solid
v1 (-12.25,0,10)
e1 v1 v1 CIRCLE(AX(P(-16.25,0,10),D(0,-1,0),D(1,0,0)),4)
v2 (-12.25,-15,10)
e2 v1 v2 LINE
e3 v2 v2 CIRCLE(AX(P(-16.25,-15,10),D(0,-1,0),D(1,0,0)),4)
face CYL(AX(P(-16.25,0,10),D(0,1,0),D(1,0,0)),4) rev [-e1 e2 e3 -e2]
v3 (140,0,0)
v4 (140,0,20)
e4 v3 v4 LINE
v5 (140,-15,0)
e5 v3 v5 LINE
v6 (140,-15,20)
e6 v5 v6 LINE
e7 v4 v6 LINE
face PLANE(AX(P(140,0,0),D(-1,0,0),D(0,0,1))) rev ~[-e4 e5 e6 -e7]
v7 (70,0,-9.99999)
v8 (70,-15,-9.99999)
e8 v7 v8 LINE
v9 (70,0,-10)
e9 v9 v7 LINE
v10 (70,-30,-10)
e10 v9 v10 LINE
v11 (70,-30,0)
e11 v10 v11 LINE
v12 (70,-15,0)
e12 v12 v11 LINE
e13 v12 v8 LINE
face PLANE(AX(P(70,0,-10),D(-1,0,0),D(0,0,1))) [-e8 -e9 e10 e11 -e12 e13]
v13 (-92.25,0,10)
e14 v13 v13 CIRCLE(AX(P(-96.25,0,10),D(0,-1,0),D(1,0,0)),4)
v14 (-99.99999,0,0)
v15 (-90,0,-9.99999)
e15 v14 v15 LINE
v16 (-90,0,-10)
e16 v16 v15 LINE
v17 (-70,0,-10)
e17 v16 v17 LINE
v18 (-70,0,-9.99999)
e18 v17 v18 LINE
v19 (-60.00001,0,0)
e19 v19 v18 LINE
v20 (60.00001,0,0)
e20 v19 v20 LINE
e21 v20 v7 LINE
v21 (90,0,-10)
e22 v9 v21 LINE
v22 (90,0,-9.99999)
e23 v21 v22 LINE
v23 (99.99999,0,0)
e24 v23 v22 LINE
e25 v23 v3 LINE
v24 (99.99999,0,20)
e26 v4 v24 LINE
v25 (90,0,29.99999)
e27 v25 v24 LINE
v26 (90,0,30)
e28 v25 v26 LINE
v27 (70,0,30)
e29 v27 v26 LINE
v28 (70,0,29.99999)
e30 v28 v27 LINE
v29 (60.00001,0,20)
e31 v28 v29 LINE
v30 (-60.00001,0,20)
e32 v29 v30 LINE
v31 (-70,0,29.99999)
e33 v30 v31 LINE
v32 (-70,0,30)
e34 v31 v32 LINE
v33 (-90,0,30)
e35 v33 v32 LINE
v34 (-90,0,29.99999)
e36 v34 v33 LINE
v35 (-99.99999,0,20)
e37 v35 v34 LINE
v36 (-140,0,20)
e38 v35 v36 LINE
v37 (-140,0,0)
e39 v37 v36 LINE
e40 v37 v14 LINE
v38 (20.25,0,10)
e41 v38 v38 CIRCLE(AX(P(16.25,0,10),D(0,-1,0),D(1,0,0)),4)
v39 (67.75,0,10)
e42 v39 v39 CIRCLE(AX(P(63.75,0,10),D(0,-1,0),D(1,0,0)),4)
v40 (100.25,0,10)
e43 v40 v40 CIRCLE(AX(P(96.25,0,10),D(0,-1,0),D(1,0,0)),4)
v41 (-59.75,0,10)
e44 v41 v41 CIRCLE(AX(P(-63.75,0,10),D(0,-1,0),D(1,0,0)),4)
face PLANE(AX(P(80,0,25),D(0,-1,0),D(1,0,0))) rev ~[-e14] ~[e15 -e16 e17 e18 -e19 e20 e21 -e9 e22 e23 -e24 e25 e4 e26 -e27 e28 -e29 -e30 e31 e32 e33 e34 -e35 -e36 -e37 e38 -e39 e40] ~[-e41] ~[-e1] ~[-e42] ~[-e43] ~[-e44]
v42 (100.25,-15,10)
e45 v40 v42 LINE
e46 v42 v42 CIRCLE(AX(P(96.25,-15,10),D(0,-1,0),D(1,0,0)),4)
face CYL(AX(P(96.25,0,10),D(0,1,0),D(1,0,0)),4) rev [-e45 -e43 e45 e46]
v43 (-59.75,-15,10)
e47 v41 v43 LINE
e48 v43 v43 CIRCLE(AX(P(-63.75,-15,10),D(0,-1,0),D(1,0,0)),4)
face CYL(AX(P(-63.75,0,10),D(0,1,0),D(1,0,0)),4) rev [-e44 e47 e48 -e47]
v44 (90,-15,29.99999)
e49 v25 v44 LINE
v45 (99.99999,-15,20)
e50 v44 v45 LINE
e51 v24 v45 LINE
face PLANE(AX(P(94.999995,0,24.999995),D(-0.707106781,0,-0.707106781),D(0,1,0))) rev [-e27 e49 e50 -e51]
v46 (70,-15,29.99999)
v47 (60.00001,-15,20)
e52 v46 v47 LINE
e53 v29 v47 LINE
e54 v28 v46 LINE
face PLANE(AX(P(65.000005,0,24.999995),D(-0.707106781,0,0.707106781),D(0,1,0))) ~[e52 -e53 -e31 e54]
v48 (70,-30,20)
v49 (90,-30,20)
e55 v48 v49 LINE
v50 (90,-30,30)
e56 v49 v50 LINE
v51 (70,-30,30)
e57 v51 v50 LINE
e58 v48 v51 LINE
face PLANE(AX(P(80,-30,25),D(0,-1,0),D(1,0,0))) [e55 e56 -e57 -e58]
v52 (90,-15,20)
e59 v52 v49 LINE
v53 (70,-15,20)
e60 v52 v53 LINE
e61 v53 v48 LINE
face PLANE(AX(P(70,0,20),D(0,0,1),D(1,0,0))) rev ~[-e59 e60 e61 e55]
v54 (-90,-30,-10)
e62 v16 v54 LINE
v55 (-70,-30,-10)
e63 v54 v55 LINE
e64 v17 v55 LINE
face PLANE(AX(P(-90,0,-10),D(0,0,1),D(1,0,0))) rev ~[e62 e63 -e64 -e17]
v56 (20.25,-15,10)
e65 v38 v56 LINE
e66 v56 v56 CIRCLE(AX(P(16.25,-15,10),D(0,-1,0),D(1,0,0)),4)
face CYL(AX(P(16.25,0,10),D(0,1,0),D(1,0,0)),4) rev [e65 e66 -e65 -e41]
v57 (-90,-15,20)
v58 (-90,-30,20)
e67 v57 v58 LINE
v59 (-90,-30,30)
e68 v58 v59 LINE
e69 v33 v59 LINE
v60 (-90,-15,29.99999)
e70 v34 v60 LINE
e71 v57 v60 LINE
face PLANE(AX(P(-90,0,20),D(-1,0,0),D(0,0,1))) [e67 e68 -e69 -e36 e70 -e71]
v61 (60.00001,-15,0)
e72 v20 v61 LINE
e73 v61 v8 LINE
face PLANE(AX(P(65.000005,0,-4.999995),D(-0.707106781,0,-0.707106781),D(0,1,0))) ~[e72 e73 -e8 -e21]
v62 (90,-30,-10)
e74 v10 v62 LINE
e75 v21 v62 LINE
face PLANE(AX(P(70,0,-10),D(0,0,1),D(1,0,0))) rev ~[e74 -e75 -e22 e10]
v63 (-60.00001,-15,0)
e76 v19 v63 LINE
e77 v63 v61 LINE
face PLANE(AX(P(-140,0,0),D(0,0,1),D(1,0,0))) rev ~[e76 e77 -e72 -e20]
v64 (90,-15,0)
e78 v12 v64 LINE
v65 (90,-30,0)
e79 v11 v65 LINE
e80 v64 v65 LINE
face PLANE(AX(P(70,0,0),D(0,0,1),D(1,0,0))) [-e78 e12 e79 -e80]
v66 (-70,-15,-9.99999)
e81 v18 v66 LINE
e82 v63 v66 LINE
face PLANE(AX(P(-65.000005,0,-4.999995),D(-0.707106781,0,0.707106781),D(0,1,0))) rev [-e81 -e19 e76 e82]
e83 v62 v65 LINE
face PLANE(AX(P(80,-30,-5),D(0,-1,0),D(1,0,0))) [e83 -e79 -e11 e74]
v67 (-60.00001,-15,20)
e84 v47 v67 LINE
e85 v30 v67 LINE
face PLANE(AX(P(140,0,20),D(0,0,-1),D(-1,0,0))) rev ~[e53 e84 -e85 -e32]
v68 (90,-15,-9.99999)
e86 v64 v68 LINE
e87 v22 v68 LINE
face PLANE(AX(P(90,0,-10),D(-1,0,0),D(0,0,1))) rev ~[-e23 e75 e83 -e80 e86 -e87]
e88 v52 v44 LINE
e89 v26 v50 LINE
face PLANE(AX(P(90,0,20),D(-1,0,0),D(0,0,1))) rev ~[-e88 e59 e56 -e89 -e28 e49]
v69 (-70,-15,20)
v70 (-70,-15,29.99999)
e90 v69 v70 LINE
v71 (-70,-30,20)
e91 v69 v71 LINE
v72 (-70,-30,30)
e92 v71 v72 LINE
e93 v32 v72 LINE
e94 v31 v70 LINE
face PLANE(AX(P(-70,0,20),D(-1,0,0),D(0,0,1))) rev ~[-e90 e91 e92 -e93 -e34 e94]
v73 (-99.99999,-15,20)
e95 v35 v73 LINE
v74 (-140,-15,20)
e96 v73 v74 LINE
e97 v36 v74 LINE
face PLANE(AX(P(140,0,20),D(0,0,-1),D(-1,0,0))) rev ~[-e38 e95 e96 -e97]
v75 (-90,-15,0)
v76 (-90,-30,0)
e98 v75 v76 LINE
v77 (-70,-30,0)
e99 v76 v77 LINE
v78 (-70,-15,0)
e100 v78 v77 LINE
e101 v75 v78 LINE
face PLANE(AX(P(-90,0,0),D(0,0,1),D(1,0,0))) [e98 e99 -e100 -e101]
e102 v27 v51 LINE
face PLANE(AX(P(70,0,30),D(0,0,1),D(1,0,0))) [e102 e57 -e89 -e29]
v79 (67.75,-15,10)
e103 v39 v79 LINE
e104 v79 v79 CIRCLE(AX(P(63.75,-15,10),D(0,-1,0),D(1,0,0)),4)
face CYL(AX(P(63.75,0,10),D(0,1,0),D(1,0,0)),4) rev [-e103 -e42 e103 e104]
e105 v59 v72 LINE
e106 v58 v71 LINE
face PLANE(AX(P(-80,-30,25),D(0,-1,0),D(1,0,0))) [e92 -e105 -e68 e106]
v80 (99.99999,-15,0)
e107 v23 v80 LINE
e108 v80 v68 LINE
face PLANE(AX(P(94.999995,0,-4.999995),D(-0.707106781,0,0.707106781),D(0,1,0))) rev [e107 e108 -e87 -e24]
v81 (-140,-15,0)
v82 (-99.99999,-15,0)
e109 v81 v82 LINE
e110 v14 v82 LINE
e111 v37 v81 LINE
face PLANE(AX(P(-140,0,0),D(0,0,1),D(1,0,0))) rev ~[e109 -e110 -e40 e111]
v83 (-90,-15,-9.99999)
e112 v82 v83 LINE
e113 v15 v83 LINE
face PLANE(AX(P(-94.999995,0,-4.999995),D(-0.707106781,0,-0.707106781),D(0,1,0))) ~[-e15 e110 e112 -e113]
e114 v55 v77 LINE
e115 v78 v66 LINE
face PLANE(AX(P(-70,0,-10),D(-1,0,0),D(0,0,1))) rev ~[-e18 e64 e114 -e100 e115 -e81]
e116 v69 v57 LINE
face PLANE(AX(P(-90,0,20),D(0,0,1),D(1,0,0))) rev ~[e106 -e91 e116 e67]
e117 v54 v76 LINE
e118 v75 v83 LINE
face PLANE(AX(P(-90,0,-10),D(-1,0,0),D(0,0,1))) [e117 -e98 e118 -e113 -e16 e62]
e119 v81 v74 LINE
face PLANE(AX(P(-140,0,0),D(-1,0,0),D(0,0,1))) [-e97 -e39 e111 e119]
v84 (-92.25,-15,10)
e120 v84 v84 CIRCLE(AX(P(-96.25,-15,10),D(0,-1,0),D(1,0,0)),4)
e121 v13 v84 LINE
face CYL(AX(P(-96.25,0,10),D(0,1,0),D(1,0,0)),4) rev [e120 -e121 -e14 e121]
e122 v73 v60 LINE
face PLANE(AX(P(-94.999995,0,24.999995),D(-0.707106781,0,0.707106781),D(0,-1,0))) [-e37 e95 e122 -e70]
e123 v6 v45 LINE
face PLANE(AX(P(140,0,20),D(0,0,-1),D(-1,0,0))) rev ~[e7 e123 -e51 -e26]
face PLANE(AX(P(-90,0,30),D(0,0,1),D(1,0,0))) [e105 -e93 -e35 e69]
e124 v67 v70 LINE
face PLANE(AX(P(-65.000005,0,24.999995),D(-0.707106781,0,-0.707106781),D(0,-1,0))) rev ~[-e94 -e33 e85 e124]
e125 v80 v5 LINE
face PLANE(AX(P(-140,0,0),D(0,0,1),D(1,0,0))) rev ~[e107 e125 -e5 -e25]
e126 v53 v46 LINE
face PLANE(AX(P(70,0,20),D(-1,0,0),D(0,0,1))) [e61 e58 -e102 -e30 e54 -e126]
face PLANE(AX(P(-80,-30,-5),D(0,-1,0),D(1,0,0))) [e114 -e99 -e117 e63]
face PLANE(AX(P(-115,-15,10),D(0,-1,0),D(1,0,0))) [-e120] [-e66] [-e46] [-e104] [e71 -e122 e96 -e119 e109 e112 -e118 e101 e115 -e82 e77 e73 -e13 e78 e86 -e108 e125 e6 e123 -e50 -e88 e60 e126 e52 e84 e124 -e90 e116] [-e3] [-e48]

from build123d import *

# Parameters (mm, degrees)
F0_W     = 50
F0_H     = 20
F0_R     = 4
F0_W_2   = 20
F0_W_3   = 140
F1_DEPTH = 15
F0_H_2   = 10
F2_DEPTH = 30
F3_SIZE  = 9.99999


# Not quite as in the source:
# - a fillet or chamfer is up to 0.001 mm smaller than in the source, because OpenCascade refuses the exact size
# - a feature names something its author has since deleted; it is built from what else it names


with BuildPart() as f1:
    # F0 (on Front) → F1 (new body)
    with BuildSketch(Plane.XZ):
        with Locations((-115, 10)):
            Rectangle(F0_W, F0_H)
        with Locations((-96.25, 10)):
            Circle(F0_R, mode=Mode.SUBTRACT)
        with Locations((-80, 10)):
            Rectangle(F0_W_2, F0_H)
        with Locations((80, 10)):
            Rectangle(F0_W_2, F0_H)
        with Locations((115, 10)):
            Rectangle(F0_W, F0_H)
        with Locations((96.25, 10)):
            Circle(F0_R, mode=Mode.SUBTRACT)
        with Locations((0, 10)):
            Rectangle(F0_W_3, F0_H)
        with Locations((-63.75, 10)):
            Circle(F0_R, mode=Mode.SUBTRACT)
        with Locations((-16.25, 10)):
            Circle(F0_R, mode=Mode.SUBTRACT)
        with Locations((16.25, 10)):
            Circle(F0_R, mode=Mode.SUBTRACT)
        with Locations((63.75, 10)):
            Circle(F0_R, mode=Mode.SUBTRACT)
    extrude(amount=F1_DEPTH)

    # F0 (on Front) → F2 (join)
    with BuildSketch(Plane.XZ):
        with Locations((80, 25)):
            Rectangle(F0_W_2, F0_H_2)
        with Locations((-80, 25)):
            Rectangle(F0_W_2, F0_H_2)
        with Locations((-80, -5)):
            Rectangle(F0_W_2, F0_H_2)
        with Locations((80, -5)):
            Rectangle(F0_W_2, F0_H_2)
    extrude(amount=F2_DEPTH)

    # F3 (size 10 in the source; OpenCascade refuses exactly that, so slightly less here)
    f3_edges = [f1.edges().sort_by_distance(p)[0] for p in [
        (70, -7.5, 20),
        (90, -7.5, 20),
        (-70, -7.5, 20),
        (-90, -7.5, 20),
        (-90, -7.5, 0),
        (-70, -7.5, 0),
        (70, -7.5, 0),
        (90, -7.5, 0),
    ]]
    chamfer(f3_edges, length=F3_SIZE)


solid = f1.part
